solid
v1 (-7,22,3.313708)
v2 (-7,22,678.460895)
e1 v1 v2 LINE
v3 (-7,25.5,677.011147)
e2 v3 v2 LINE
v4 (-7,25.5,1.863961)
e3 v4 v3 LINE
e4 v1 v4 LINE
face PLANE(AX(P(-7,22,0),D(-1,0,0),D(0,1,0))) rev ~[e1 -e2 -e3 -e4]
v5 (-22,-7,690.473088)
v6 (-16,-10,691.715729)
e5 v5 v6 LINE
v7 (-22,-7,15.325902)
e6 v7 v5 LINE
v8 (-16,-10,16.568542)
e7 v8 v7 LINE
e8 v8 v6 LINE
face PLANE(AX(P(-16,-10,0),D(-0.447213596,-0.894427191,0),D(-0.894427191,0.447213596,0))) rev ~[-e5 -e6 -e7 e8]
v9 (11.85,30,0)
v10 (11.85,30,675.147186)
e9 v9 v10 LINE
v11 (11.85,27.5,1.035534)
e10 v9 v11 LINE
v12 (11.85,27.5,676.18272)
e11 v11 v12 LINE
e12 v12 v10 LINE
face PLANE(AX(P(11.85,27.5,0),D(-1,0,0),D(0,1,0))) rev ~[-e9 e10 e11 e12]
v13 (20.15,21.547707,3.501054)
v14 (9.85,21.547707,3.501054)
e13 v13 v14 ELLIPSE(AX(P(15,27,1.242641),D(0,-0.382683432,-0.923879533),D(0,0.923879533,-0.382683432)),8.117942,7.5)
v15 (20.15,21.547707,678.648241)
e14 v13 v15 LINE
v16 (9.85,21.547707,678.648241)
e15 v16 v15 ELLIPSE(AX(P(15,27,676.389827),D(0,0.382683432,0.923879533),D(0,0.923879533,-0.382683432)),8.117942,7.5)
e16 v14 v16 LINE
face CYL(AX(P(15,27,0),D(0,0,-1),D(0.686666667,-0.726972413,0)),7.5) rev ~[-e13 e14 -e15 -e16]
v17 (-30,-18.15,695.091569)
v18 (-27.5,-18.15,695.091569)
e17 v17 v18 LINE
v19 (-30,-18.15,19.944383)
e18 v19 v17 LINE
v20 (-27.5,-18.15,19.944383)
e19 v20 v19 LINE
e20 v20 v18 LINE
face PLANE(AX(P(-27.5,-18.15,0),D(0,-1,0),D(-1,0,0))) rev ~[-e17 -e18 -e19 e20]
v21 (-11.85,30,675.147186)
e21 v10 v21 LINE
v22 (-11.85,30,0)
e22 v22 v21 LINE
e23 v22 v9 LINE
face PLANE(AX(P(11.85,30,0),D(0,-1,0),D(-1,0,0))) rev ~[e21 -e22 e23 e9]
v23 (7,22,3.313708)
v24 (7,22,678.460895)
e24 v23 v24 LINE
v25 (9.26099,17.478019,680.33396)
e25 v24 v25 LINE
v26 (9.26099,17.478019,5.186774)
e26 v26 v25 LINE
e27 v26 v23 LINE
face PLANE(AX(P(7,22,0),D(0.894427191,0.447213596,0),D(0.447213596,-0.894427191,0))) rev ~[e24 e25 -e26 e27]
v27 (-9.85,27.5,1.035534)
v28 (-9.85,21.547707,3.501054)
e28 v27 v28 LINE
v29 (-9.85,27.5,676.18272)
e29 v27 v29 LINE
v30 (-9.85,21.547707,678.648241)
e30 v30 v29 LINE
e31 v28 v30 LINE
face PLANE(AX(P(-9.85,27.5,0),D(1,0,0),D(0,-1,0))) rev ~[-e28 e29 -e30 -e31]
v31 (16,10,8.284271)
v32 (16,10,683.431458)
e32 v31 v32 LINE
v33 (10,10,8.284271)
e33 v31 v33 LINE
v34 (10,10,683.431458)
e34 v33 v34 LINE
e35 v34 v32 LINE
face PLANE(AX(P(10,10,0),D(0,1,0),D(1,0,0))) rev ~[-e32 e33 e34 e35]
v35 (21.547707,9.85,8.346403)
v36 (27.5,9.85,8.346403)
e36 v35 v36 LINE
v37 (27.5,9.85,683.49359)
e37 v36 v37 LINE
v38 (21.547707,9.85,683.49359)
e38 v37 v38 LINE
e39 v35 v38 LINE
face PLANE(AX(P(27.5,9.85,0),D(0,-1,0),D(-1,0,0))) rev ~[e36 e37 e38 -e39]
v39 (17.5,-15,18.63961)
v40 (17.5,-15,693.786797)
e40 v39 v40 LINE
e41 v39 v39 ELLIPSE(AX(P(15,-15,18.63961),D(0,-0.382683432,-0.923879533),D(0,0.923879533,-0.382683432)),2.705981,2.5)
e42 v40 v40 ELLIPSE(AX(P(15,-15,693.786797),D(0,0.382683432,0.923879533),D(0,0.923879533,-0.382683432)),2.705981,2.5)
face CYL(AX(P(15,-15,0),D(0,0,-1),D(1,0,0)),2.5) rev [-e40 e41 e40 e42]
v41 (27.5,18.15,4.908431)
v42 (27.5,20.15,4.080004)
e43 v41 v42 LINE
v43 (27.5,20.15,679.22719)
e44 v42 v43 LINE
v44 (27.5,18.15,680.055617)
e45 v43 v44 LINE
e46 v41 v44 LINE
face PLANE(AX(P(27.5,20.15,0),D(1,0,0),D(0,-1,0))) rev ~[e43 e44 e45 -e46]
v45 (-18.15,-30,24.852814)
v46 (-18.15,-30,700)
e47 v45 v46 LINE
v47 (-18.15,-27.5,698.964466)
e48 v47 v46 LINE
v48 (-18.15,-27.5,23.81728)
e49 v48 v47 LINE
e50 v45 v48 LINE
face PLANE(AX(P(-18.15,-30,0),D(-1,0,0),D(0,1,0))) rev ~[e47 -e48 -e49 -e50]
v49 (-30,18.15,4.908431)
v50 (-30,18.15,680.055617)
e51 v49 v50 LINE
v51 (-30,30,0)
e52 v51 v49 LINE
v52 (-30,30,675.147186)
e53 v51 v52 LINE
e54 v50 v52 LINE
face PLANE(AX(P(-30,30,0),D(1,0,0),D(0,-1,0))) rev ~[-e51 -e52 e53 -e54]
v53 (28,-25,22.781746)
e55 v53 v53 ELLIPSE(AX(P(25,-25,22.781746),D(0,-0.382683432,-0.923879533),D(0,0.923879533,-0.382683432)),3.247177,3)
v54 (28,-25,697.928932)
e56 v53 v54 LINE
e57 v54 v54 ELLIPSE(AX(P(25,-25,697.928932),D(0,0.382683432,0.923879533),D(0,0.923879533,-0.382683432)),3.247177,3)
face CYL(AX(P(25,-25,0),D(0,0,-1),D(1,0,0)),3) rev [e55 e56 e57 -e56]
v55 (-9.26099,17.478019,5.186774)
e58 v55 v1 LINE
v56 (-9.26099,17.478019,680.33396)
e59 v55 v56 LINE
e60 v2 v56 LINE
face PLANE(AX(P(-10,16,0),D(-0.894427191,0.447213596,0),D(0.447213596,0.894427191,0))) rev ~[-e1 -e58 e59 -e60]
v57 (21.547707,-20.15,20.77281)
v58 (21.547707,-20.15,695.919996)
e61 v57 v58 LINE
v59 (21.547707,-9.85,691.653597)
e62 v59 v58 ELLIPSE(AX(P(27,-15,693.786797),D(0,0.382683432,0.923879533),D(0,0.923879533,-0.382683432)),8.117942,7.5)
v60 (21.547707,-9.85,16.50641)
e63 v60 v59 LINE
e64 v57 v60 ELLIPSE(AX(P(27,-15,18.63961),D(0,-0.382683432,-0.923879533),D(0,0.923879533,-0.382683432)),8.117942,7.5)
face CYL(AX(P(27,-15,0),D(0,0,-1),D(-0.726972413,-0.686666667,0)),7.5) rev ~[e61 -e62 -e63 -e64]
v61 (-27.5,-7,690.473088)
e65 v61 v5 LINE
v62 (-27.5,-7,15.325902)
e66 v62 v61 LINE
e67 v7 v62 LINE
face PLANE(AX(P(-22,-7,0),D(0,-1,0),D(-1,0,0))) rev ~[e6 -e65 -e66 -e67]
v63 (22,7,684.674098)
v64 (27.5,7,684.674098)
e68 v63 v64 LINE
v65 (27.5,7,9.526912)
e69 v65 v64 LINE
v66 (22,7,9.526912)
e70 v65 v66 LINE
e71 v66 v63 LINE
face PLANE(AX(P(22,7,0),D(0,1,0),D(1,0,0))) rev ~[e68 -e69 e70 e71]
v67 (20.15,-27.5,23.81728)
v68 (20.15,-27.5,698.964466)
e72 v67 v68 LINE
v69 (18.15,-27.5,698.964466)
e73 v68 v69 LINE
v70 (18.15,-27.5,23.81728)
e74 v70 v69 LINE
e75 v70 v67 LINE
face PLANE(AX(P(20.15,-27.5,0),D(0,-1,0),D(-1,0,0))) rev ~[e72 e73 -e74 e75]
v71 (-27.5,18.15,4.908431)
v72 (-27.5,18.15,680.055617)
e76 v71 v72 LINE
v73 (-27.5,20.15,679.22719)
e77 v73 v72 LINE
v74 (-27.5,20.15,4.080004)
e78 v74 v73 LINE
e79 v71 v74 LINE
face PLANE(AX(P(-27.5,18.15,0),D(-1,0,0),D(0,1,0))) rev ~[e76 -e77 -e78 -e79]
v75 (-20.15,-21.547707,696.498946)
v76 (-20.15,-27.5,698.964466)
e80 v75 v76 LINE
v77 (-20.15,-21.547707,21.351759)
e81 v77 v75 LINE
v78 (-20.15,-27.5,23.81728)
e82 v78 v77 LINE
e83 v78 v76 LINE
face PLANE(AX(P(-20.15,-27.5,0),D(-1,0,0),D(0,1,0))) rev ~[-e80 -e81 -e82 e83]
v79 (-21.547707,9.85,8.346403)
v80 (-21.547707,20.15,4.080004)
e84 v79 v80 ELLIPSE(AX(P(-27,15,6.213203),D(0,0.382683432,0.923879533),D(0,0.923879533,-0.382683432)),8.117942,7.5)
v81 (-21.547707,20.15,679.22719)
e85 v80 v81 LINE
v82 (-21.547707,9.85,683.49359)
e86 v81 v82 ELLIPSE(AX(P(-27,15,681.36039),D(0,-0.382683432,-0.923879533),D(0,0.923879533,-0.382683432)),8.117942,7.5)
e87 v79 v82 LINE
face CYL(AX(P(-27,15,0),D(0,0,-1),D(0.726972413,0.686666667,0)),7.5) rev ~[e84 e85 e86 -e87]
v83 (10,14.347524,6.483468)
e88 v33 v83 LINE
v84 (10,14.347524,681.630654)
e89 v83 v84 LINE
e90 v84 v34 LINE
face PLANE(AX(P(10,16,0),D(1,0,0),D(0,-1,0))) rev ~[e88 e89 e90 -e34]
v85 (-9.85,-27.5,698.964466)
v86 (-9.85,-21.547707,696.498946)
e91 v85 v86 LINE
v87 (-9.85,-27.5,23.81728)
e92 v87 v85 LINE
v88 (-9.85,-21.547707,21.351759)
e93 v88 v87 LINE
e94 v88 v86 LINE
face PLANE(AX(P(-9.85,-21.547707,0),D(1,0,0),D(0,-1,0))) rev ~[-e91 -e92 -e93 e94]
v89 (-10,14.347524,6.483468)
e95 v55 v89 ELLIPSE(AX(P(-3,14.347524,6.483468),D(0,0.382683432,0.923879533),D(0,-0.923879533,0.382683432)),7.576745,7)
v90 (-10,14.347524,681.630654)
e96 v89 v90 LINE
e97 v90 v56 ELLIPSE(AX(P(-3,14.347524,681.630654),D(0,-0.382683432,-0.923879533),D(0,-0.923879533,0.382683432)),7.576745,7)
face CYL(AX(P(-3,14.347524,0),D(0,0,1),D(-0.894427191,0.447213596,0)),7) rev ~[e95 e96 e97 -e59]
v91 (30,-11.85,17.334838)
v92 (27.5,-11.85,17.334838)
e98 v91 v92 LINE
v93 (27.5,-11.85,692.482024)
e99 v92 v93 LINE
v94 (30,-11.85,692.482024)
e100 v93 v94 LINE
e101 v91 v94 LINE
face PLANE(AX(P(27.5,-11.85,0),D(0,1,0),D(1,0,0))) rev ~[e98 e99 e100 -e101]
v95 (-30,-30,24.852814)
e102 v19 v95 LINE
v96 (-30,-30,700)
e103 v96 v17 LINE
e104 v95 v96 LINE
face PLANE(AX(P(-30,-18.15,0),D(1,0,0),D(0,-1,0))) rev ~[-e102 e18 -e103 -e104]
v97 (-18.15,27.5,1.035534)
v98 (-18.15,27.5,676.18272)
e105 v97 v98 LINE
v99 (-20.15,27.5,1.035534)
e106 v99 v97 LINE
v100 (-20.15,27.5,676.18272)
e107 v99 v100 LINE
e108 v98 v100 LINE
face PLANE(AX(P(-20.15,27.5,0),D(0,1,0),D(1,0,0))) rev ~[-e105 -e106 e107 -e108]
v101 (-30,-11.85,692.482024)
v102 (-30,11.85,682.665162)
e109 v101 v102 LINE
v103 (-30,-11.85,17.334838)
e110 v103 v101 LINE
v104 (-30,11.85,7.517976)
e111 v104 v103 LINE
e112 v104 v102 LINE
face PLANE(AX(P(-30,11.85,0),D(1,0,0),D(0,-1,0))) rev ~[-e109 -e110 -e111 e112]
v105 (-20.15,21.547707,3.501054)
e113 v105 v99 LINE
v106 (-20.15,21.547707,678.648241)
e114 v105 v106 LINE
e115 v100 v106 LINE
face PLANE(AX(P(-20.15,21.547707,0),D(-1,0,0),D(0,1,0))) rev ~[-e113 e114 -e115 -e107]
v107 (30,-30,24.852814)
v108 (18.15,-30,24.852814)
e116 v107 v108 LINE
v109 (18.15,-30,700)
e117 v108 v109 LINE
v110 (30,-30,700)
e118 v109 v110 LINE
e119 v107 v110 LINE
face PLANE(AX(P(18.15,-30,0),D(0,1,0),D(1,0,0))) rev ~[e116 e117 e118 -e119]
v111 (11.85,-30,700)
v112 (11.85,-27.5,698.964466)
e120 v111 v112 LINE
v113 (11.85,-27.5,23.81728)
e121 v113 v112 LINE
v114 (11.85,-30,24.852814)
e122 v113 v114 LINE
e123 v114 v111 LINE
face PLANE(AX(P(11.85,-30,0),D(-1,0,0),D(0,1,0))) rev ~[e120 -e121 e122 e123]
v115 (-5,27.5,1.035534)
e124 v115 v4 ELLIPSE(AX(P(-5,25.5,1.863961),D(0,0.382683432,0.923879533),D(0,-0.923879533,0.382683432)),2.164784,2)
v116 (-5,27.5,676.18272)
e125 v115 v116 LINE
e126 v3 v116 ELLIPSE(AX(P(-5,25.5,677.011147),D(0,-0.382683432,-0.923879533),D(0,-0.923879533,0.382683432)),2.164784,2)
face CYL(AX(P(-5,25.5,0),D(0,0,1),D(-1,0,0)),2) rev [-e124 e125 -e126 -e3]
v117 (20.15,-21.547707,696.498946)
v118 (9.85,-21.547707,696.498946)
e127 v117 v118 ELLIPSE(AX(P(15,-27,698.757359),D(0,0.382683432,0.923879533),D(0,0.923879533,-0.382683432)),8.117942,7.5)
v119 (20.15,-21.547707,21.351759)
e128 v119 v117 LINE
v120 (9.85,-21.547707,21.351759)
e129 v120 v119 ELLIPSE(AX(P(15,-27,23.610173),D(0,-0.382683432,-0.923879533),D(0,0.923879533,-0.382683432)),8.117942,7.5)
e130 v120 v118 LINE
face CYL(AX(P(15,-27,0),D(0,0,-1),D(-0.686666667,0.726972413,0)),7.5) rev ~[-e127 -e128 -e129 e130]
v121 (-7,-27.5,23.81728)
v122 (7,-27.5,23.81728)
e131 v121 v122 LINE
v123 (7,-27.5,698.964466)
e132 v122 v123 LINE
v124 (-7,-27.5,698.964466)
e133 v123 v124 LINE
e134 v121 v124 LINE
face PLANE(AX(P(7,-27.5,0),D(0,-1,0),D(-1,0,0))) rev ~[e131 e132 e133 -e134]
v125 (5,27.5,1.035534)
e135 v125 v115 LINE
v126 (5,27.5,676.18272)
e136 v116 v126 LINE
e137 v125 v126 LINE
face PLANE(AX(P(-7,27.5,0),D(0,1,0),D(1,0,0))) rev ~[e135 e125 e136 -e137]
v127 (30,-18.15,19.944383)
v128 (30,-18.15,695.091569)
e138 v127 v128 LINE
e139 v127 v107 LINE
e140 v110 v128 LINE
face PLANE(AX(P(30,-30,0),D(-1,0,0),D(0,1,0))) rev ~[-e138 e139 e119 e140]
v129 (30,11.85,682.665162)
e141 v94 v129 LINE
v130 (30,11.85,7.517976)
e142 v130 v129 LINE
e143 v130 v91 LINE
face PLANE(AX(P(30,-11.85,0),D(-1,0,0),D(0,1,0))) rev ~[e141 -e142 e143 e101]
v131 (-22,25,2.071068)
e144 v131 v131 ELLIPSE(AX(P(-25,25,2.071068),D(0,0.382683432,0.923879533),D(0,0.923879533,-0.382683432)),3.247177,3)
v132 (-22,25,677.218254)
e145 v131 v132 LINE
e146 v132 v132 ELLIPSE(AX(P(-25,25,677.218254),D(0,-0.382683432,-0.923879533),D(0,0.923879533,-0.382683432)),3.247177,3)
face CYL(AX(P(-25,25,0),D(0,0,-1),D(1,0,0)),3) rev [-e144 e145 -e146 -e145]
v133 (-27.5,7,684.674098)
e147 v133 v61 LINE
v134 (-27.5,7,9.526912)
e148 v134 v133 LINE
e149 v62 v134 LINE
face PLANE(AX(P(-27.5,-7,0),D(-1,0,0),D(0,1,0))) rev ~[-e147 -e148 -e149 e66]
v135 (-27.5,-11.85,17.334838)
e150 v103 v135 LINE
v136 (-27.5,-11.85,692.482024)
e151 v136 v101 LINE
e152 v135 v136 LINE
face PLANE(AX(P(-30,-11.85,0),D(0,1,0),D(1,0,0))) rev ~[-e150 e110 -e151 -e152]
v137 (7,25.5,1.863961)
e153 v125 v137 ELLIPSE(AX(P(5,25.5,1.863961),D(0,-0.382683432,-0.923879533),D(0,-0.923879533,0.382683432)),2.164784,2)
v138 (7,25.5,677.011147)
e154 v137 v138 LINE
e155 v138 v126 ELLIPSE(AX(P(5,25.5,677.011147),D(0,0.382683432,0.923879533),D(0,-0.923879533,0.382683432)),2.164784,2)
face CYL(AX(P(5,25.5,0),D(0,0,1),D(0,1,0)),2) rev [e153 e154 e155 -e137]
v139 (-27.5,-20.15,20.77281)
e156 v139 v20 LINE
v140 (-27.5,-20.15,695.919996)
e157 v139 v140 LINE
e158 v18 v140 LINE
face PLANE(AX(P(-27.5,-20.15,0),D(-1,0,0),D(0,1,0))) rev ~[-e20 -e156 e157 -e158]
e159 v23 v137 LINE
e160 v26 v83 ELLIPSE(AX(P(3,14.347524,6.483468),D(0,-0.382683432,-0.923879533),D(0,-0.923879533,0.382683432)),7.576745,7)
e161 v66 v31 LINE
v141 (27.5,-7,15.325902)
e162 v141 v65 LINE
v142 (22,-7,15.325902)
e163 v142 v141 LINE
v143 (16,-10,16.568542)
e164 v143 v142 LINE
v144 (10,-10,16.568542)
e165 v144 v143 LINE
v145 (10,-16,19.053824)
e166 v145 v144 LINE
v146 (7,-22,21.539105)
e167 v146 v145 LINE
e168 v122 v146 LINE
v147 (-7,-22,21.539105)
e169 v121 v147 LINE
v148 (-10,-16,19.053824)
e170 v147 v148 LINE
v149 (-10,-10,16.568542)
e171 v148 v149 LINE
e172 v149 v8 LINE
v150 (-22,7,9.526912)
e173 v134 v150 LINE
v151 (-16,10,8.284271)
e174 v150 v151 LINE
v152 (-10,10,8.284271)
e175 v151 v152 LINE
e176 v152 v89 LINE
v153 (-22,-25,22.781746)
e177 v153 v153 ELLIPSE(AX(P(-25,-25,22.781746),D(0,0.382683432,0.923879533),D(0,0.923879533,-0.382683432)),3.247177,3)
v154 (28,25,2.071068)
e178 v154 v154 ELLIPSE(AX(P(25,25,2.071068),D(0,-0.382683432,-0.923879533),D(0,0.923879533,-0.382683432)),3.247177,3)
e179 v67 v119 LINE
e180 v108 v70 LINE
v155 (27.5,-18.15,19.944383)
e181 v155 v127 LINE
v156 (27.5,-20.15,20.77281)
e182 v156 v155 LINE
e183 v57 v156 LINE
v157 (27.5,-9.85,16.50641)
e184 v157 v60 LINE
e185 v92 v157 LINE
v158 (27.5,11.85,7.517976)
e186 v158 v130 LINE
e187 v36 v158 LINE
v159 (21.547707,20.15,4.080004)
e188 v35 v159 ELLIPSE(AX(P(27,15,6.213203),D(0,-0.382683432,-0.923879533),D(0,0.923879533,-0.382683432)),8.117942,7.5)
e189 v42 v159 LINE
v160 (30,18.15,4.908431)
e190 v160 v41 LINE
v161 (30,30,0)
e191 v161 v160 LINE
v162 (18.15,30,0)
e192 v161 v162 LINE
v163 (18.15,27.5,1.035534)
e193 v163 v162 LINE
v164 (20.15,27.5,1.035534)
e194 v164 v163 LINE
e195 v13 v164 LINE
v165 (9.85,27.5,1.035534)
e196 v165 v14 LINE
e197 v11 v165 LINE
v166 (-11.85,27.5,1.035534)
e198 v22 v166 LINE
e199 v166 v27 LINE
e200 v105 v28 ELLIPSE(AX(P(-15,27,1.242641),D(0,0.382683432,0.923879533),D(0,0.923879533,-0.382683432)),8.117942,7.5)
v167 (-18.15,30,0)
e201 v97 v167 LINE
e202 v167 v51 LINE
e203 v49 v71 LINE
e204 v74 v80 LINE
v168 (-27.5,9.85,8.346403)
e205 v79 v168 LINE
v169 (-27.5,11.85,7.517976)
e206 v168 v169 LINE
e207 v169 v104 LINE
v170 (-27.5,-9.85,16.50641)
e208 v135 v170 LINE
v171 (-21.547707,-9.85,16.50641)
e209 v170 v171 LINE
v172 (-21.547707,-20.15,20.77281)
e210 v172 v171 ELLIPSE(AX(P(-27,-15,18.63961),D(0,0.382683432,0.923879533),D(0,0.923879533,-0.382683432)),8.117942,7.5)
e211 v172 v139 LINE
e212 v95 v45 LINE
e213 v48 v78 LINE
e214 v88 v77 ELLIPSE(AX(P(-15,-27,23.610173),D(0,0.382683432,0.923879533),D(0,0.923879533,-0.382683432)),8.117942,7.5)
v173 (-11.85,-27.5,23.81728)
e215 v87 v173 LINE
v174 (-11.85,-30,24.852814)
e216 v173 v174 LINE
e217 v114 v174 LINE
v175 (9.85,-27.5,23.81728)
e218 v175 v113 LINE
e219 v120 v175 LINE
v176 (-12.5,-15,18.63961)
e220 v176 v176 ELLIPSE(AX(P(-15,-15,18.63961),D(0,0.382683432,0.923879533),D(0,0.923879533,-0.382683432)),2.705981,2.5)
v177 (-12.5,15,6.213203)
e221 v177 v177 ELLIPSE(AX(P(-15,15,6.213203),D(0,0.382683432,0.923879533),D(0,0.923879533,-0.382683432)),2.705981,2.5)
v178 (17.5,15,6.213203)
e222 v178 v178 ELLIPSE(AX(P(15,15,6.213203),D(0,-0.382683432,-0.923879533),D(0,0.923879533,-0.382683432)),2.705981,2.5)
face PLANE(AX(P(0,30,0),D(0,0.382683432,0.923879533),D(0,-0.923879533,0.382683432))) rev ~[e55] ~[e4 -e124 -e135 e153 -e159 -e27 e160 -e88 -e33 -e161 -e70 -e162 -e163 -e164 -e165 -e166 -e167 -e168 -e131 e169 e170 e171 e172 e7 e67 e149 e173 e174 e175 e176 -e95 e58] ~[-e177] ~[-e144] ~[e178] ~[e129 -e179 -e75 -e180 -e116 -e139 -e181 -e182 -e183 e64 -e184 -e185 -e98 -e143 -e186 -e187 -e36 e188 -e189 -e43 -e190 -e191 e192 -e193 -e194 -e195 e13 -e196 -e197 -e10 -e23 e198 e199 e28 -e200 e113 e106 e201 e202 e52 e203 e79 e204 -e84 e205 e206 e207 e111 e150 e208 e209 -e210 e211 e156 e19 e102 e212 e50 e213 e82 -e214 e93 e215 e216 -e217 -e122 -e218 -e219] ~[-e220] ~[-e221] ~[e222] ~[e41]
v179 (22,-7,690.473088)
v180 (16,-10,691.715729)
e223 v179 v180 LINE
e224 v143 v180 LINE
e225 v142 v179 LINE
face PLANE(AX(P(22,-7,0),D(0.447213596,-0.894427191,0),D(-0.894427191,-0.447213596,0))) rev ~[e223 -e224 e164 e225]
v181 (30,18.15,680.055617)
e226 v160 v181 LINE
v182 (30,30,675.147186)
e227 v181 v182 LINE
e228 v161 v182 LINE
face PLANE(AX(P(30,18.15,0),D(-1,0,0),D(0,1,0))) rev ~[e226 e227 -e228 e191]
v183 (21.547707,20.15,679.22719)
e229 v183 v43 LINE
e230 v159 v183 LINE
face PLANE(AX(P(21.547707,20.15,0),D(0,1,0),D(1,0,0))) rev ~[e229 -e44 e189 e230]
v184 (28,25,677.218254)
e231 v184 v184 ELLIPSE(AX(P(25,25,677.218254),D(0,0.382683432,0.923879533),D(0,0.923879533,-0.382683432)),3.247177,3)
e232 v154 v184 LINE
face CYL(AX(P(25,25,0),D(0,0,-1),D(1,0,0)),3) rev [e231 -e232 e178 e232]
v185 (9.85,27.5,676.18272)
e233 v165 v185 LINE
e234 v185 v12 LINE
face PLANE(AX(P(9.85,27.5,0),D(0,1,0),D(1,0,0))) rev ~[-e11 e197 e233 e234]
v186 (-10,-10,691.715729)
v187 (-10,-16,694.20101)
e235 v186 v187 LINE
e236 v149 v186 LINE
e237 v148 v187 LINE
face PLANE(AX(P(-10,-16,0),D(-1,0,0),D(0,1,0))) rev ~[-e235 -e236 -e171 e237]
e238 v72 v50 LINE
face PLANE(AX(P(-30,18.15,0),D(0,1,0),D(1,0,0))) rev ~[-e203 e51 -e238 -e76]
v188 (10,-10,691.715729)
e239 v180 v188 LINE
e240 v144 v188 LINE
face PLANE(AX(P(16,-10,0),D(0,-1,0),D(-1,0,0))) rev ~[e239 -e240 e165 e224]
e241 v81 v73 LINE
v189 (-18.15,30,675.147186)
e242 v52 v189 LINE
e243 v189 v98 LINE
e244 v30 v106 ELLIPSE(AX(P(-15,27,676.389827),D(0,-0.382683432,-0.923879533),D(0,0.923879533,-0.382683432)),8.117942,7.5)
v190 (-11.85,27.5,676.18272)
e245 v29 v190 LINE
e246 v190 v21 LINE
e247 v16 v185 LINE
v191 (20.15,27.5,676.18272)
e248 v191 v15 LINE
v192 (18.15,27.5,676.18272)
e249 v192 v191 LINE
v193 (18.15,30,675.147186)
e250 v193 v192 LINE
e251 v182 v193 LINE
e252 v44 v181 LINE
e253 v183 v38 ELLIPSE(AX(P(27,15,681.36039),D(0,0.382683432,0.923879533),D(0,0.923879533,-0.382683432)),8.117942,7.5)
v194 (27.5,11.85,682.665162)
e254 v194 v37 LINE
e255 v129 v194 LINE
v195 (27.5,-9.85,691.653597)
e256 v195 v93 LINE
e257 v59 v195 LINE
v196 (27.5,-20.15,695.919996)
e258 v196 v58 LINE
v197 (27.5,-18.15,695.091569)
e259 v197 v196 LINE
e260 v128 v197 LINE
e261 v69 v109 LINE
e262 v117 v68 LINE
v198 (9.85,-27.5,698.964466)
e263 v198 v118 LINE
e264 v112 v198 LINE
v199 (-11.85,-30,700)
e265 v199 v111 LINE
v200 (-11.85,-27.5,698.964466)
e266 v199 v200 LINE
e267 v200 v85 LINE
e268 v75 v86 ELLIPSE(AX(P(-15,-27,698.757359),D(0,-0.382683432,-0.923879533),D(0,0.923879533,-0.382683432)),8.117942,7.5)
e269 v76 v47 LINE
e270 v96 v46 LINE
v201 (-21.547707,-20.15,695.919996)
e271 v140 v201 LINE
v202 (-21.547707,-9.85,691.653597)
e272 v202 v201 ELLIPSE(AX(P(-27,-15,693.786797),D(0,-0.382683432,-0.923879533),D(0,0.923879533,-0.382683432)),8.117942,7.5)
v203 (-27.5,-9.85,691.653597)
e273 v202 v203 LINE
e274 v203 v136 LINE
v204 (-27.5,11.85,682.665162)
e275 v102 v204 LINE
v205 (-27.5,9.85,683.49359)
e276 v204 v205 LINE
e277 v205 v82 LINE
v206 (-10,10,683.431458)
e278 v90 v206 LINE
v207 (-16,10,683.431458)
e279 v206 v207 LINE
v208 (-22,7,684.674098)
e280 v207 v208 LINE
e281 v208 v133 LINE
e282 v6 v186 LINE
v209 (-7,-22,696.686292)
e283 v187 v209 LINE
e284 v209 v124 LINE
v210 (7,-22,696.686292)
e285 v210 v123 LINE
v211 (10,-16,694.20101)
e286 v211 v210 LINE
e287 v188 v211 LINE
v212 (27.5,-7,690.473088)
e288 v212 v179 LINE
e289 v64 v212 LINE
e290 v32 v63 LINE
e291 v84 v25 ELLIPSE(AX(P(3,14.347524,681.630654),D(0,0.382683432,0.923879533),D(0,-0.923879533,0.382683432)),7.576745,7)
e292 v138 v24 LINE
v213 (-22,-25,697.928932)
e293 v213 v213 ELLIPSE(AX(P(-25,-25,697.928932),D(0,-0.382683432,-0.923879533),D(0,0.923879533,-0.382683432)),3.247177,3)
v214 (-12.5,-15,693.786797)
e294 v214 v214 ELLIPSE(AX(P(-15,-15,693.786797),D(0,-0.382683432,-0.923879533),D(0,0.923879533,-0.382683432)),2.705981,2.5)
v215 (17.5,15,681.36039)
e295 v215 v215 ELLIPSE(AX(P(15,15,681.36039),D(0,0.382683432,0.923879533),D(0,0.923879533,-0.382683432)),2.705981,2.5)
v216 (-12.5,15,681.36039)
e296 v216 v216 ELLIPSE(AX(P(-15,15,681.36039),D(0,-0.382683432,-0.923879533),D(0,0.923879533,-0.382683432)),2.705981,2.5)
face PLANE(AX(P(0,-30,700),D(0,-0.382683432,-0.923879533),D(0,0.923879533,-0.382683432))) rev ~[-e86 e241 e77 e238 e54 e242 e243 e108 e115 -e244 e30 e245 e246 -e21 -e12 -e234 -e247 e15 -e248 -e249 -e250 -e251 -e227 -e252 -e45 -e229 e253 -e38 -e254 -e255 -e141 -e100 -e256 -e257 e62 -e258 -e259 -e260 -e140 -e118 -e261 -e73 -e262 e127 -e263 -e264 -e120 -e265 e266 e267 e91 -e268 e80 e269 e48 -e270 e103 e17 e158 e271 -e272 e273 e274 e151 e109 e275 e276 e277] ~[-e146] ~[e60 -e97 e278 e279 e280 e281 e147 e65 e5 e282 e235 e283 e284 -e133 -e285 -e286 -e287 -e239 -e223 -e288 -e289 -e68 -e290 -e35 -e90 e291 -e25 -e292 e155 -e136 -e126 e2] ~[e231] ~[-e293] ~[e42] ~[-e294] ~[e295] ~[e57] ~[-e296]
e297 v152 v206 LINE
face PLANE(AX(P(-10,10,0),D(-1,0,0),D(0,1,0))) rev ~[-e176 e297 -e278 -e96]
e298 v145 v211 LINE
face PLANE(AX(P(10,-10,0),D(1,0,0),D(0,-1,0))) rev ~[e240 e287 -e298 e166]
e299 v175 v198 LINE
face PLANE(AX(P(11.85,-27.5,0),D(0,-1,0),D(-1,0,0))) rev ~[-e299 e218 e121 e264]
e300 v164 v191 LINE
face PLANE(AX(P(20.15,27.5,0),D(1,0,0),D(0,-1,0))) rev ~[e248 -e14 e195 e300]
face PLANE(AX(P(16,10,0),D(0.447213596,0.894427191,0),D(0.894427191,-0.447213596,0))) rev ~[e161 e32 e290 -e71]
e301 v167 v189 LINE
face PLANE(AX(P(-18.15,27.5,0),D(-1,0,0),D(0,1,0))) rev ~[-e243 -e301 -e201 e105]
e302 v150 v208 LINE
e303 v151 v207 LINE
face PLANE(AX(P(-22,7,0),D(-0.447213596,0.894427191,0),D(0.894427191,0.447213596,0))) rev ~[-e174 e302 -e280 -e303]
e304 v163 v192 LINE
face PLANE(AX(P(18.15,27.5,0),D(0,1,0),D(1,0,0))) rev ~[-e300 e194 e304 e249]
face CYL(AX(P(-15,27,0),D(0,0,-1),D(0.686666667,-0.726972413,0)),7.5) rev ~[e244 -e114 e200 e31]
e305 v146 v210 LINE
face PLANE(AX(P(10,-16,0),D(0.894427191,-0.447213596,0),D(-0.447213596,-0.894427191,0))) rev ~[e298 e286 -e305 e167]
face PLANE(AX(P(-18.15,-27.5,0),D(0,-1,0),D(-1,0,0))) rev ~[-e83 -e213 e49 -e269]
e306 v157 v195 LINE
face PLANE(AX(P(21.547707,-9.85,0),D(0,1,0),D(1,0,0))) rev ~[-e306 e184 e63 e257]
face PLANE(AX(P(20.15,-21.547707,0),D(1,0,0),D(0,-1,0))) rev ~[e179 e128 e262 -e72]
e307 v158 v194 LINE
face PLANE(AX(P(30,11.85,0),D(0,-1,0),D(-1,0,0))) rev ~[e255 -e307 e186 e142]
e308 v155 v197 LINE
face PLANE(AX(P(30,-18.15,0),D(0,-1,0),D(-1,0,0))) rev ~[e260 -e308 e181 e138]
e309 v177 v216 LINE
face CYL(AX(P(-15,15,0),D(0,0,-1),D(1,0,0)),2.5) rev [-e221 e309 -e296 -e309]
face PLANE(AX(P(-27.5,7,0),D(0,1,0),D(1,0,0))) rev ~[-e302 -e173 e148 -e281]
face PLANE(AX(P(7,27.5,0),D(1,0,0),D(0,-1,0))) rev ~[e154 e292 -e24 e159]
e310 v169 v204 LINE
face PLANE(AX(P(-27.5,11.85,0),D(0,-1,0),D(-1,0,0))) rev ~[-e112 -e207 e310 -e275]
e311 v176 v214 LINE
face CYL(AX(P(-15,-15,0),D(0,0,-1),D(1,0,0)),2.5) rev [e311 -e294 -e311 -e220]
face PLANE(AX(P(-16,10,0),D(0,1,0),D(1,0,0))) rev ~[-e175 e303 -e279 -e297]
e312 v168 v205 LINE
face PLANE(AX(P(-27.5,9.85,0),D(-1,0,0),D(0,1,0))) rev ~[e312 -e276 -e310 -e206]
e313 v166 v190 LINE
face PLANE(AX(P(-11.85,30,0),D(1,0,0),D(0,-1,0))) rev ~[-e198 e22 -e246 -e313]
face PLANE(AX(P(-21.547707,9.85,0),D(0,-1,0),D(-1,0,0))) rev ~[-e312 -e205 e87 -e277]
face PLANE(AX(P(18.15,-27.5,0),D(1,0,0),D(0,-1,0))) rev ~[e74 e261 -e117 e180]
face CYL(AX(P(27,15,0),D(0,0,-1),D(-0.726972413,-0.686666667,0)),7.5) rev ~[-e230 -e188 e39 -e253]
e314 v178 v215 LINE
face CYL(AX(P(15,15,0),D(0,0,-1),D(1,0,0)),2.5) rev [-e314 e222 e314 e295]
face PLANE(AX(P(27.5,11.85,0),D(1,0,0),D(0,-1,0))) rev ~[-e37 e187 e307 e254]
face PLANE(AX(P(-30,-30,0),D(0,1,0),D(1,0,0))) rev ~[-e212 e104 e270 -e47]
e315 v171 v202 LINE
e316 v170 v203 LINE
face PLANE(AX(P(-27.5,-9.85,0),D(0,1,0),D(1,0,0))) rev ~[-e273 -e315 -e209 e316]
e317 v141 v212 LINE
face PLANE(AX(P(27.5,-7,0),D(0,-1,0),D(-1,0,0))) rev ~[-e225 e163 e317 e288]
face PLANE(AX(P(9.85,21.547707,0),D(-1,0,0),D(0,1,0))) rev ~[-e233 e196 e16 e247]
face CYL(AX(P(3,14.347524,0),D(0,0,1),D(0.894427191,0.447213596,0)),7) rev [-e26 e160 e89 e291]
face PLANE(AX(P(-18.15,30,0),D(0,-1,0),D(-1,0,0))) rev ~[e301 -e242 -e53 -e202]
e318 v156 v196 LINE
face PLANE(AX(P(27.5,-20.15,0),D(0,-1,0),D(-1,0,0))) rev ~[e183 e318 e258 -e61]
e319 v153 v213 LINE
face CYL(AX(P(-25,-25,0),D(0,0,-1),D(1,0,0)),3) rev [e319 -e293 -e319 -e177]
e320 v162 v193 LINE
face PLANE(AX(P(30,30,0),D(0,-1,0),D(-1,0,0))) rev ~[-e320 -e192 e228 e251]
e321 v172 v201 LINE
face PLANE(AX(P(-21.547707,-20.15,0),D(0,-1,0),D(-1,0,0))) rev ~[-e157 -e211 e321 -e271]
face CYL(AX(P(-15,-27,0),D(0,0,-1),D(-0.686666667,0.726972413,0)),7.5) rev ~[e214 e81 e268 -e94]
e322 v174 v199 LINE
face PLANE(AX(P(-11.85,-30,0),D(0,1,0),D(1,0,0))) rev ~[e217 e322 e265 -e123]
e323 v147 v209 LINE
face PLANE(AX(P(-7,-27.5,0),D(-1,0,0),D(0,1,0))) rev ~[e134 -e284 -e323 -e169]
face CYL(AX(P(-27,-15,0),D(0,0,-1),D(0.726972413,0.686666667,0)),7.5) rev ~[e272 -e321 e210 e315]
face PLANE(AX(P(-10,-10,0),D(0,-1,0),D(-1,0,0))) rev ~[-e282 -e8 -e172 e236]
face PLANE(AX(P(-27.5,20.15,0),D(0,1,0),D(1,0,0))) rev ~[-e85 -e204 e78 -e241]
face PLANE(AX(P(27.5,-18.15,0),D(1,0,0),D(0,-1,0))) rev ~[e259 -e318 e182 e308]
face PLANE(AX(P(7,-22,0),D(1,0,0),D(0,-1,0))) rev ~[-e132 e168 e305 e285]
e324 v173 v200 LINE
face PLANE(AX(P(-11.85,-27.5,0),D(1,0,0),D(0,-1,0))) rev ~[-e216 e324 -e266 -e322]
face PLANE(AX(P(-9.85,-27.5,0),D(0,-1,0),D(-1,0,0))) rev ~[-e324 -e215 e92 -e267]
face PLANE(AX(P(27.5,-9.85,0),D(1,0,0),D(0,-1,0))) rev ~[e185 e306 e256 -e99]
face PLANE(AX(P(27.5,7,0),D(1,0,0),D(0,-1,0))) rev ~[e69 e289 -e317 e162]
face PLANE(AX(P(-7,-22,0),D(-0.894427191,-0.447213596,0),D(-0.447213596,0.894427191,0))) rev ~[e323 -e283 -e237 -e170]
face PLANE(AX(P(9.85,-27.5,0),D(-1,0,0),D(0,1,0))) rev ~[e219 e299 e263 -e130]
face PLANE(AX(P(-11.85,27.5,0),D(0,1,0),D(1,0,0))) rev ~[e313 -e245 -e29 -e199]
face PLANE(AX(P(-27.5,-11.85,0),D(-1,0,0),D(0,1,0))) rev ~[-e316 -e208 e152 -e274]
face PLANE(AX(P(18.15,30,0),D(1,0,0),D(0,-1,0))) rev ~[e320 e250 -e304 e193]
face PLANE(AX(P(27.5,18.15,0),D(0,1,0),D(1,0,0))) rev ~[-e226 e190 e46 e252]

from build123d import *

# Parameters (mm, degrees)
F0_R          = 3
F0_R_2        = 2.5
F1_DEPTH      = 700
F2_R          = 2
F3_R          = 7
F6_DEPTH      = 30
F6_DEPTH_BACK = 30


# Not quite as in the source:
# - a feature names something its author has since deleted; it is built from what else it names


with BuildPart() as f1:
    # F0 (on Top) → F1 (new body)
    with BuildSketch(Plane.XY):
        with BuildLine():
            Line((18.15, -30), (30, -30))
            Line((30, -30), (30, -18.15))
            Line((30, -18.15), (27.5, -18.15))
            Line((27.5, -18.15), (27.5, -20.15))
            Line((27.5, -20.15), (21.5477069044, -20.15))
            ThreePointArc((21.5477069044, -20.15), (19.5, -15), (21.5477069044, -9.85))
            Line((21.5477069044, -9.85), (27.5, -9.85))
            Line((27.5, -9.85), (27.5, -11.85))
            Line((27.5, -11.85), (30, -11.85))
            Line((30, -11.85), (30, 11.85))
            Line((30, 11.85), (27.5, 11.85))
            Line((27.5, 11.85), (27.5, 9.85))
            Line((27.5, 9.85), (21.5477069044, 9.85))
            ThreePointArc((21.5477069044, 9.85), (19.5, 15), (21.5477069044, 20.15))
            Line((21.5477069044, 20.15), (27.5, 20.15))
            Line((27.5, 20.15), (27.5, 18.15))
            Line((27.5, 18.15), (30, 18.15))
            Line((30, 18.15), (30, 30))
            Line((30, 30), (18.15, 30))
            Line((18.15, 30), (18.15, 27.5))
            Line((18.15, 27.5), (20.15, 27.5))
            Line((20.15, 27.5), (20.15, 21.5477069044))
            ThreePointArc((20.15, 21.5477069044), (15, 19.5), (9.85, 21.5477069044))
            Line((9.85, 21.5477069044), (9.85, 27.5))
            Line((9.85, 27.5), (11.85, 27.5))
            Line((11.85, 27.5), (11.85, 30))
            Line((11.85, 30), (-11.85, 30))
            Line((-11.85, 30), (-11.85, 27.5))
            Line((-11.85, 27.5), (-9.85, 27.5))
            Line((-9.85, 27.5), (-9.85, 21.5477069044))
            ThreePointArc((-9.85, 21.5477069044), (-15, 19.5), (-20.15, 21.5477069044))
            Line((-20.15, 21.5477069044), (-20.15, 27.5))
            Line((-20.15, 27.5), (-18.15, 27.5))
            Line((-18.15, 27.5), (-18.15, 30))
            Line((-18.15, 30), (-30, 30))
            Line((-30, 30), (-30, 18.15))
            Line((-30, 18.15), (-27.5, 18.15))
            Line((-27.5, 18.15), (-27.5, 20.15))
            Line((-27.5, 20.15), (-21.5477069044, 20.15))
            ThreePointArc((-21.5477069044, 20.15), (-19.5, 15), (-21.5477069044, 9.85))
            Line((-21.5477069044, 9.85), (-27.5, 9.85))
            Line((-27.5, 9.85), (-27.5, 11.85))
            Line((-27.5, 11.85), (-30, 11.85))
            Line((-30, 11.85), (-30, -11.85))
            Line((-30, -11.85), (-27.5, -11.85))
            Line((-27.5, -11.85), (-27.5, -9.85))
            Line((-27.5, -9.85), (-21.5477069044, -9.85))
            ThreePointArc((-21.5477069044, -9.85), (-19.5, -15), (-21.5477069044, -20.15))
            Line((-21.5477069044, -20.15), (-27.5, -20.15))
            Line((-27.5, -20.15), (-27.5, -18.15))
            Line((-27.5, -18.15), (-30, -18.15))
            Line((-30, -18.15), (-30, -30))
            Line((-30, -30), (-18.15, -30))
            Line((-18.15, -30), (-18.15, -27.5))
            Line((-18.15, -27.5), (-20.15, -27.5))
            Line((-20.15, -27.5), (-20.15, -21.5477069044))
            ThreePointArc((-20.15, -21.5477069044), (-15, -19.5), (-9.85, -21.5477069044))
            Line((-9.85, -21.5477069044), (-9.85, -27.5))
            Line((-9.85, -27.5), (-11.85, -27.5))
            Line((-11.85, -27.5), (-11.85, -30))
            Line((-11.85, -30), (11.85, -30))
            Line((11.85, -30), (11.85, -27.5))
            Line((11.85, -27.5), (9.85, -27.5))
            Line((9.85, -27.5), (9.85, -21.5477069044))
            ThreePointArc((9.85, -21.5477069044), (15, -19.5), (20.15, -21.5477069044))
            Line((20.15, -21.5477069044), (20.15, -27.5))
            Line((20.15, -27.5), (18.15, -27.5))
            Line((18.15, -27.5), (18.15, -30))
        make_face()
        with Locations((-25, -25)):
            Circle(F0_R, mode=Mode.SUBTRACT)
        with Locations((-15, -15)):
            Circle(F0_R_2, mode=Mode.SUBTRACT)
        with Locations((25, -25)):
            Circle(F0_R, mode=Mode.SUBTRACT)
        with Locations((15, -15)):
            Circle(F0_R_2, mode=Mode.SUBTRACT)
        with Locations((-25, 25)):
            Circle(F0_R, mode=Mode.SUBTRACT)
        with Locations((-15, 15)):
            Circle(F0_R_2, mode=Mode.SUBTRACT)
        Polygon((-7, 22), (-7, 27.5), (0, 27.5), (7, 27.5), (7, 22), (10, 16), (10, 10), (16, 10), (22, 7), (27.5, 7), (27.5, 0), (27.5, -7), (22, -7), (16, -10), (10, -10), (10, -16), (7, -22), (7, -27.5), (0, -27.5), (-7, -27.5), (-7, -22), (-10, -16), (-10, -10), (-16, -10), (-22, -7), (-27.5, -7), (-27.5, 0), (-27.5, 7), (-22, 7), (-16, 10), (-10, 10), (-10, 16), align=None, mode=Mode.SUBTRACT)
        with Locations((15, 15)):
            Circle(F0_R_2, mode=Mode.SUBTRACT)
        with Locations((25, 25)):
            Circle(F0_R, mode=Mode.SUBTRACT)
    extrude(amount=F1_DEPTH)

    # F2
    f2_edges = [f1.edges().sort_by_distance(p)[0] for p in [
        (-7, 27.5, 350),
        (7, 27.5, 350),
    ]]
    fillet(f2_edges, radius=F2_R)

    # F3
    f3_edges = [f1.edges().sort_by_distance(p)[0] for p in [
        (-10, 16, 350),
        (10, 16, 350),
    ]]
    fillet(f3_edges, radius=F3_R)

    # F5 (on Right) → F6 (cut, two sides)
    with BuildSketch(Plane.YZ) as f6_sk:
        Polygon((30, 0), (-73.1568263622, 42.7289565306), (-138.818297568, -115.7918577799), (-35.6614712058, -158.5208143105), align=None)
        Polygon((194.2250905883, 866.574744896), (61.7300701058, 921.4559793268), (-30, 700), (102.4950204826, 645.1187655692), align=None)
    extrude(amount=F6_DEPTH, mode=Mode.SUBTRACT)
    extrude(f6_sk.sketch, amount=-F6_DEPTH_BACK, mode=Mode.SUBTRACT)


solid = f1.part
